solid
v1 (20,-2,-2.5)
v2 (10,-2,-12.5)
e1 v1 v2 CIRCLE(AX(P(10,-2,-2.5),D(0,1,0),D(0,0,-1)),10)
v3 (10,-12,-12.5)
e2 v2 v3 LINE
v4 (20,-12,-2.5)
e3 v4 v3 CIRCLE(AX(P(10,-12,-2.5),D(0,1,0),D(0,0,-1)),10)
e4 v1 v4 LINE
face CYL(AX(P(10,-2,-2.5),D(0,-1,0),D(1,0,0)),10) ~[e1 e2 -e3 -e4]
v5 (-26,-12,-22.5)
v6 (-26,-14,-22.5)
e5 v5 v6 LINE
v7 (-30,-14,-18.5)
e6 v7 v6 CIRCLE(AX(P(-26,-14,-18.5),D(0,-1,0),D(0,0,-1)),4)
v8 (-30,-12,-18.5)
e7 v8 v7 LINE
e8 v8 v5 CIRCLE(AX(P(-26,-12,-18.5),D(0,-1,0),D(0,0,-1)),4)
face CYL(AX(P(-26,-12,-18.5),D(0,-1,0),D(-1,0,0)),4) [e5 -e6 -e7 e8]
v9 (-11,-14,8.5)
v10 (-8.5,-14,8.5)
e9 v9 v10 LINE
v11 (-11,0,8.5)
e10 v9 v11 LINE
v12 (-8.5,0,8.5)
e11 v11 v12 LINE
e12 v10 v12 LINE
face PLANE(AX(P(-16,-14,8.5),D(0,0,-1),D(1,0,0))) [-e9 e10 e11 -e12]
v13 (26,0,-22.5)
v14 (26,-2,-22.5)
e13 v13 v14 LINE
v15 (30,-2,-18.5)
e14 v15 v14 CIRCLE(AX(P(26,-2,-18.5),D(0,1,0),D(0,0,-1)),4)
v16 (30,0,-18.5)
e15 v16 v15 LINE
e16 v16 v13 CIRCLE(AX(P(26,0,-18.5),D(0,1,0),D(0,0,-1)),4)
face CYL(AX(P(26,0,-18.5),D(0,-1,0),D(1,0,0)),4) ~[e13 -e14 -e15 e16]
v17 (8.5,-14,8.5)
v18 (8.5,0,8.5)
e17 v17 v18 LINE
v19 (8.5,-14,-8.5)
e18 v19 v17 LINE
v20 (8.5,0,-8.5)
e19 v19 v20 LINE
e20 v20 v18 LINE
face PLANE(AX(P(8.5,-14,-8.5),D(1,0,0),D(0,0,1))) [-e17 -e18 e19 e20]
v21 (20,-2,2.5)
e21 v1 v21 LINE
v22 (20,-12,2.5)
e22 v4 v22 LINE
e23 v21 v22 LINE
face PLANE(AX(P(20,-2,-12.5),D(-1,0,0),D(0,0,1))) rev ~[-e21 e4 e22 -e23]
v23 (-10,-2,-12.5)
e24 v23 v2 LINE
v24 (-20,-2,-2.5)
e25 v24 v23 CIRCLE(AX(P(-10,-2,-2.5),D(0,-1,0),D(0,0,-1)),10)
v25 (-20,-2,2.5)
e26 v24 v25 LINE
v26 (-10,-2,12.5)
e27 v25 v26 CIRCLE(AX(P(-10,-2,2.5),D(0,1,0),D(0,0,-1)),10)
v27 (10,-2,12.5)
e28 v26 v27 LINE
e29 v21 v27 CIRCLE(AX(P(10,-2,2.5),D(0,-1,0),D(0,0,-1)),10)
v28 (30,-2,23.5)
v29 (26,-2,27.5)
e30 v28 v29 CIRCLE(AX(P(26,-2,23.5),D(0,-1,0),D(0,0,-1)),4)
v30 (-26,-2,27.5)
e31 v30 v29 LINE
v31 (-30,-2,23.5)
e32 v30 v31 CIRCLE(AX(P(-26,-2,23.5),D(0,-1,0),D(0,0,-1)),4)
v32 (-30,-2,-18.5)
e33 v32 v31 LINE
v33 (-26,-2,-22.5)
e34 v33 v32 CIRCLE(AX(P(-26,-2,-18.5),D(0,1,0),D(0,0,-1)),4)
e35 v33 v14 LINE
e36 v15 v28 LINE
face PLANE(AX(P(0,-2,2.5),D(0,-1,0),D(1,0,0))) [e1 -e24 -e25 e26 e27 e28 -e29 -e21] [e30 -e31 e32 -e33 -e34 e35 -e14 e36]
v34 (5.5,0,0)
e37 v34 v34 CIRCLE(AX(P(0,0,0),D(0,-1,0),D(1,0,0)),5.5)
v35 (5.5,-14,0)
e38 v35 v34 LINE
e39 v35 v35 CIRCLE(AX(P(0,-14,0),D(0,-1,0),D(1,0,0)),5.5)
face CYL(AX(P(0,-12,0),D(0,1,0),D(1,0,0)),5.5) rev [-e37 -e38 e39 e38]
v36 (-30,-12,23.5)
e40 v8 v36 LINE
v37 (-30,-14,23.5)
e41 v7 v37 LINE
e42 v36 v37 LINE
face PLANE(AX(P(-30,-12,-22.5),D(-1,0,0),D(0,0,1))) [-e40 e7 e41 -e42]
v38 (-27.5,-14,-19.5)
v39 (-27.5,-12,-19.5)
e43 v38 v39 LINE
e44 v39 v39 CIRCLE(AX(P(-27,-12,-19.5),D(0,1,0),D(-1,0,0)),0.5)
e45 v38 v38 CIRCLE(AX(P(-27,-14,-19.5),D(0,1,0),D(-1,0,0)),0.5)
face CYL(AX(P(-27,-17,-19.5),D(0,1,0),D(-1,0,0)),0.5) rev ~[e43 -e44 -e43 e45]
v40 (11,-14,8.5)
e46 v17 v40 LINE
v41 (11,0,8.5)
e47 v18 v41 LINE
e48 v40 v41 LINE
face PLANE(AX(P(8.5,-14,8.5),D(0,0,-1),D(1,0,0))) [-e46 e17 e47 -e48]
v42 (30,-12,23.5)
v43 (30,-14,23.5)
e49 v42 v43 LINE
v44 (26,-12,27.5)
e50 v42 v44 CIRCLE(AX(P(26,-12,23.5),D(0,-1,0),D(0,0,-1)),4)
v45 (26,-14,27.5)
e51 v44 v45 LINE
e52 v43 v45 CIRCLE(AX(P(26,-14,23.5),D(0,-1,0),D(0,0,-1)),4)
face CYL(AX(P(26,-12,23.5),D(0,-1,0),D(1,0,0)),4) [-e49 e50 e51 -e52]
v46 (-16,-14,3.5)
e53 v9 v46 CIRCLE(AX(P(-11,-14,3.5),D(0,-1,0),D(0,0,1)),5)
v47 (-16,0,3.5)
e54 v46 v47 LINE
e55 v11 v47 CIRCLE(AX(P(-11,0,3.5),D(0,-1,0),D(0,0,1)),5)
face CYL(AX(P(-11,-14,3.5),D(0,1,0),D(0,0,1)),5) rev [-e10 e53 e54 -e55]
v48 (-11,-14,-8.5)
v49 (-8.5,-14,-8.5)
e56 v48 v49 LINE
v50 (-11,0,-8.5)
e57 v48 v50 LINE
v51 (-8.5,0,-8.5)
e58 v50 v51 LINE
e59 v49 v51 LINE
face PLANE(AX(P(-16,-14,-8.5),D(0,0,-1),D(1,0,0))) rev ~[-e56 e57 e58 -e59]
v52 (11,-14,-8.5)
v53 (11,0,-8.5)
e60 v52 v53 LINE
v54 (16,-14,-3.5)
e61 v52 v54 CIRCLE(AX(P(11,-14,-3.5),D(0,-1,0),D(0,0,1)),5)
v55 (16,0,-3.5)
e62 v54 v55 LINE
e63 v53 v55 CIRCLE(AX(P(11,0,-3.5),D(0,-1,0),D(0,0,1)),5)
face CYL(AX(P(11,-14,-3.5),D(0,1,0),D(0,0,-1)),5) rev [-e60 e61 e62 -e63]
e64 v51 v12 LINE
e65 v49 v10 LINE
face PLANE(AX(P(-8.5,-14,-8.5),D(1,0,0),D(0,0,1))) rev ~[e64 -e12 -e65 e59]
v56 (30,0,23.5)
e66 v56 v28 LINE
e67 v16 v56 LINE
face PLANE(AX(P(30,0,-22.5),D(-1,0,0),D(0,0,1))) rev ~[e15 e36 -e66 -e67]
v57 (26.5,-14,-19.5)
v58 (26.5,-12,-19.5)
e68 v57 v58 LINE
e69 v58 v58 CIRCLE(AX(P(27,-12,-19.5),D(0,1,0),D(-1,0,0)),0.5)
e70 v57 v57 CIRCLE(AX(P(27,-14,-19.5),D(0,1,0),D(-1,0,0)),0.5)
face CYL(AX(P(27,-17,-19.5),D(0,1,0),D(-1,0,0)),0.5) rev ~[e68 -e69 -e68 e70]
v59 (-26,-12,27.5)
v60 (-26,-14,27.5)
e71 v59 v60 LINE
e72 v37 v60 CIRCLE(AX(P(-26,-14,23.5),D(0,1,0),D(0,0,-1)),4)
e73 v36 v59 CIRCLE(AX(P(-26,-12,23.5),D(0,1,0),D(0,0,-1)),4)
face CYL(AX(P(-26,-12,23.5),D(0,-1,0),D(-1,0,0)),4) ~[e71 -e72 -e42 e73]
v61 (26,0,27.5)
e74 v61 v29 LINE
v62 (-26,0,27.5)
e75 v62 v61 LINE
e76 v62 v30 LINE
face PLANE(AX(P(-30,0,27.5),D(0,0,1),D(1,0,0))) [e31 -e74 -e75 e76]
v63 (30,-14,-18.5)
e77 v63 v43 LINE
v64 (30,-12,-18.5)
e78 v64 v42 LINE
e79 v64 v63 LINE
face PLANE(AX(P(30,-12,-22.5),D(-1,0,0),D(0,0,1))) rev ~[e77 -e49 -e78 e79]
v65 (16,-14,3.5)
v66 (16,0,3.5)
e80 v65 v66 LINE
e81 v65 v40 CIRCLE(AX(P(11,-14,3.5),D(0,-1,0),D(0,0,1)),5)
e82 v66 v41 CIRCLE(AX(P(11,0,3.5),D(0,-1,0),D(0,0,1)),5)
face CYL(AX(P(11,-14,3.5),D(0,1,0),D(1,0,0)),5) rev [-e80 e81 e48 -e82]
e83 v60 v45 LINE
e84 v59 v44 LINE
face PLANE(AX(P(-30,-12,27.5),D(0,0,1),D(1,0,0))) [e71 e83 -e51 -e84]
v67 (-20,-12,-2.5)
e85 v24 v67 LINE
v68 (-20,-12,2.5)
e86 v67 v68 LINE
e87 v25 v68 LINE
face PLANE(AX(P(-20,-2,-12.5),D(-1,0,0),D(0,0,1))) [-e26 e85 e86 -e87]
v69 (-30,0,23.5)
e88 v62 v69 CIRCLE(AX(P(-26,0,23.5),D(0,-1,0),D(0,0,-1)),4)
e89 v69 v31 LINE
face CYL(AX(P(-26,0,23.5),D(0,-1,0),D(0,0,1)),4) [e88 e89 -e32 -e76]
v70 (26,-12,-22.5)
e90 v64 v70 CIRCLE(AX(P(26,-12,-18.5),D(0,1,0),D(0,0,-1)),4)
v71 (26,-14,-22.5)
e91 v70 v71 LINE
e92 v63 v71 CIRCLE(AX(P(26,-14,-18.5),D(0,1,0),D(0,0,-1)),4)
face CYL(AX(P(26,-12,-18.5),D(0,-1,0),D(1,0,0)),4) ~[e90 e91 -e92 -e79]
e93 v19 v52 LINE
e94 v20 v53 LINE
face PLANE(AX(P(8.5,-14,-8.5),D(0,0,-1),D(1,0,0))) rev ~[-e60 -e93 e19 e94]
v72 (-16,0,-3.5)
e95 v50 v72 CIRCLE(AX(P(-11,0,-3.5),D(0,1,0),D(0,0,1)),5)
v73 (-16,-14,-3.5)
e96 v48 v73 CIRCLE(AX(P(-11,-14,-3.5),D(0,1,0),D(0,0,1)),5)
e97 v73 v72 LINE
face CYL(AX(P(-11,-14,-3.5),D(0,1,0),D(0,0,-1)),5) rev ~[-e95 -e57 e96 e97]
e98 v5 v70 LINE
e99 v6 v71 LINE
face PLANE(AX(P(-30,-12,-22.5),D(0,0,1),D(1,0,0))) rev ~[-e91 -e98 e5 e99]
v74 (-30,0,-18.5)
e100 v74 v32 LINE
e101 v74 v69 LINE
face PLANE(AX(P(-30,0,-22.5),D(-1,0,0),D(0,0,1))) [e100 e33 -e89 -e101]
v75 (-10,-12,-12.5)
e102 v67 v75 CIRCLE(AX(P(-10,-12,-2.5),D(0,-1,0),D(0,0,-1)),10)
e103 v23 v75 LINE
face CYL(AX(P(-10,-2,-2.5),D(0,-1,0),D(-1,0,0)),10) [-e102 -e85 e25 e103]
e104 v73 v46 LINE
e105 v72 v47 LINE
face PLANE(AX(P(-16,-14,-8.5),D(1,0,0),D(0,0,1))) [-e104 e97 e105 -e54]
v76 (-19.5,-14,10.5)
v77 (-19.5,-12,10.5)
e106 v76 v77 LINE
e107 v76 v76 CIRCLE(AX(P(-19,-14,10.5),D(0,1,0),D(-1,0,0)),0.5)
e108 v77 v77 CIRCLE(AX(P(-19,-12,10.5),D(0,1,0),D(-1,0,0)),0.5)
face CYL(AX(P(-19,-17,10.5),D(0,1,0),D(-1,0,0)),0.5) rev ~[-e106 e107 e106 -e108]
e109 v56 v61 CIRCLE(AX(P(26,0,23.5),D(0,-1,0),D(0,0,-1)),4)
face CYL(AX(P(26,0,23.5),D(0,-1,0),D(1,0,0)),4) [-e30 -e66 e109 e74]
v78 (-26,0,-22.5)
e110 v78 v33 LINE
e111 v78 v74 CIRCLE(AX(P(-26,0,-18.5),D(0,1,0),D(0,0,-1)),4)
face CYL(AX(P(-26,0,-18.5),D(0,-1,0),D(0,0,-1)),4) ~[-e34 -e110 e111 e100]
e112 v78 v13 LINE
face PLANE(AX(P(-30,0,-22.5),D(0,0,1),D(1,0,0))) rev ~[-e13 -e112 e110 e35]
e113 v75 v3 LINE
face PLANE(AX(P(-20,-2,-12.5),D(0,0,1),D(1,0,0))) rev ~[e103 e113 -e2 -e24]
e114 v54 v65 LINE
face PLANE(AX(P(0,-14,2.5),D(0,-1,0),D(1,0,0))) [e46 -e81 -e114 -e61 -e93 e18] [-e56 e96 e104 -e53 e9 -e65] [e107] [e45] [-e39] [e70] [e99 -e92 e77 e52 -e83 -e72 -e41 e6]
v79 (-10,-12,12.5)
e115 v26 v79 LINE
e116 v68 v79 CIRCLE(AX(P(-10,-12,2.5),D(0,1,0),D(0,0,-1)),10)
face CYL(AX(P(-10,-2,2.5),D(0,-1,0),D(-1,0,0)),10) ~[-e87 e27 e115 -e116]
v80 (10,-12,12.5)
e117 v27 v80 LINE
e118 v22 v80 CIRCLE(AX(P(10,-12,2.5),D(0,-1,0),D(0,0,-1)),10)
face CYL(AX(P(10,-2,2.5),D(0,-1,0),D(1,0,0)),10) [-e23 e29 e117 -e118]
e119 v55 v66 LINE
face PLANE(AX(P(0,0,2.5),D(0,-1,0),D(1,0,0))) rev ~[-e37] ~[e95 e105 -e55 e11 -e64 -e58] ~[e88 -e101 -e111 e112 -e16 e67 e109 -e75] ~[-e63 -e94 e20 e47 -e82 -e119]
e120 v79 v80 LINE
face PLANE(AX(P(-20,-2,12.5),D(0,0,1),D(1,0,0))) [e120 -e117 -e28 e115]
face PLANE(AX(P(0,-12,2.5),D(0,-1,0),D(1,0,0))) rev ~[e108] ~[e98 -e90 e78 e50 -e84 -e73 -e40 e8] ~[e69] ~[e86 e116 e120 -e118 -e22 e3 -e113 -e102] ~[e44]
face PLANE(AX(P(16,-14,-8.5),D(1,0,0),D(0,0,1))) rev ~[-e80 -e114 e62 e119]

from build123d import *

# Parameters (mm, degrees)
F0_W      = 60
F0_H      = 50
F0_R      = 5.5
F1_DEPTH  = 2
F2_W      = 40
F2_H      = 25
F2_R      = 5.5
F3_DEPTH  = 10
F4_R      = 10
F5_W      = 60
F5_H      = 50
F5_R      = 5.5
F6_DEPTH  = 2
F7_R      = 4
F9_D      = 1
F9_DEPTH  = 3
F9_TIP    = 0.3004303095
F10_W     = 7.5
F10_H     = 17
F11_DEPTH = 25
F12_R     = 5


# Not quite as in the source:
# - a feature names something its author has since deleted; it is built from what else it names


with BuildPart() as f1:
    # F0 (on Front) → F1 (new body)
    with BuildSketch(Plane.XZ):
        with Locations((0, 2.5)):
            Rectangle(F0_W, F0_H)
        Circle(F0_R, mode=Mode.SUBTRACT)
    extrude(amount=F1_DEPTH)

    # F2 (on face) → F3 (join)
    with BuildSketch(Plane.XZ.offset(2)):
        Rectangle(F2_W, F2_H)
        Circle(F2_R, mode=Mode.SUBTRACT)
    extrude(amount=F3_DEPTH)

    # F4
    f4_edges = [f1.edges().sort_by_distance(p)[0] for p in [
        (20, -7, 12.5),
        (20, -7, -12.5),
        (-20, -7, -12.5),
        (-20, -7, 12.5),
    ]]
    fillet(f4_edges, radius=F4_R)

    # F5 (on face) → F6 (join)
    with BuildSketch(Plane.XZ.offset(12)):
        with Locations((0, 2.5)):
            Rectangle(F5_W, F5_H)
        Circle(F5_R, mode=Mode.SUBTRACT)
    extrude(amount=F6_DEPTH)

    # F7
    f7_edges = [f1.edges().sort_by_distance(p)[0] for p in [
        (30, -13, 27.5),
        (30, -1, 27.5),
        (30, -13, -22.5),
        (30, -1, -22.5),
        (-30, -13, -22.5),
        (-30, -1, -22.5),
        (-30, -13, 27.5),
        (-30, -1, 27.5),
    ]]
    fillet(f7_edges, radius=F7_R)

    # F9
    with Locations(Plane.XZ.offset(14)):
        with Locations((-19, 10.5), (-27, -19.5), (27, -19.5)):
            Hole(F9_D / 2, depth=F9_DEPTH)
            with Locations((0, 0, -(F9_DEPTH + F9_TIP / 2))):  # 118° drill point
                Cone(0, F9_D / 2, F9_TIP, mode=Mode.SUBTRACT)

    # F10 (on face) → F11 (cut)
    with BuildSketch(Plane.XZ.offset(14)):
        with Locations((-12.25, 0)):
            Rectangle(F10_W, F10_H)
        with Locations((12.25, 0)):
            Rectangle(F10_W, F10_H)
    extrude(amount=-F11_DEPTH, mode=Mode.SUBTRACT)

    # F12
    f12_edges = [f1.edges().sort_by_distance(p)[0] for p in [
        (16, -7, -8.5),
        (16, -7, 8.5),
        (-16, -7, 8.5),
        (-16, -7, -8.5),
    ]]
    fillet(f12_edges, radius=F12_R)


solid = f1.part
